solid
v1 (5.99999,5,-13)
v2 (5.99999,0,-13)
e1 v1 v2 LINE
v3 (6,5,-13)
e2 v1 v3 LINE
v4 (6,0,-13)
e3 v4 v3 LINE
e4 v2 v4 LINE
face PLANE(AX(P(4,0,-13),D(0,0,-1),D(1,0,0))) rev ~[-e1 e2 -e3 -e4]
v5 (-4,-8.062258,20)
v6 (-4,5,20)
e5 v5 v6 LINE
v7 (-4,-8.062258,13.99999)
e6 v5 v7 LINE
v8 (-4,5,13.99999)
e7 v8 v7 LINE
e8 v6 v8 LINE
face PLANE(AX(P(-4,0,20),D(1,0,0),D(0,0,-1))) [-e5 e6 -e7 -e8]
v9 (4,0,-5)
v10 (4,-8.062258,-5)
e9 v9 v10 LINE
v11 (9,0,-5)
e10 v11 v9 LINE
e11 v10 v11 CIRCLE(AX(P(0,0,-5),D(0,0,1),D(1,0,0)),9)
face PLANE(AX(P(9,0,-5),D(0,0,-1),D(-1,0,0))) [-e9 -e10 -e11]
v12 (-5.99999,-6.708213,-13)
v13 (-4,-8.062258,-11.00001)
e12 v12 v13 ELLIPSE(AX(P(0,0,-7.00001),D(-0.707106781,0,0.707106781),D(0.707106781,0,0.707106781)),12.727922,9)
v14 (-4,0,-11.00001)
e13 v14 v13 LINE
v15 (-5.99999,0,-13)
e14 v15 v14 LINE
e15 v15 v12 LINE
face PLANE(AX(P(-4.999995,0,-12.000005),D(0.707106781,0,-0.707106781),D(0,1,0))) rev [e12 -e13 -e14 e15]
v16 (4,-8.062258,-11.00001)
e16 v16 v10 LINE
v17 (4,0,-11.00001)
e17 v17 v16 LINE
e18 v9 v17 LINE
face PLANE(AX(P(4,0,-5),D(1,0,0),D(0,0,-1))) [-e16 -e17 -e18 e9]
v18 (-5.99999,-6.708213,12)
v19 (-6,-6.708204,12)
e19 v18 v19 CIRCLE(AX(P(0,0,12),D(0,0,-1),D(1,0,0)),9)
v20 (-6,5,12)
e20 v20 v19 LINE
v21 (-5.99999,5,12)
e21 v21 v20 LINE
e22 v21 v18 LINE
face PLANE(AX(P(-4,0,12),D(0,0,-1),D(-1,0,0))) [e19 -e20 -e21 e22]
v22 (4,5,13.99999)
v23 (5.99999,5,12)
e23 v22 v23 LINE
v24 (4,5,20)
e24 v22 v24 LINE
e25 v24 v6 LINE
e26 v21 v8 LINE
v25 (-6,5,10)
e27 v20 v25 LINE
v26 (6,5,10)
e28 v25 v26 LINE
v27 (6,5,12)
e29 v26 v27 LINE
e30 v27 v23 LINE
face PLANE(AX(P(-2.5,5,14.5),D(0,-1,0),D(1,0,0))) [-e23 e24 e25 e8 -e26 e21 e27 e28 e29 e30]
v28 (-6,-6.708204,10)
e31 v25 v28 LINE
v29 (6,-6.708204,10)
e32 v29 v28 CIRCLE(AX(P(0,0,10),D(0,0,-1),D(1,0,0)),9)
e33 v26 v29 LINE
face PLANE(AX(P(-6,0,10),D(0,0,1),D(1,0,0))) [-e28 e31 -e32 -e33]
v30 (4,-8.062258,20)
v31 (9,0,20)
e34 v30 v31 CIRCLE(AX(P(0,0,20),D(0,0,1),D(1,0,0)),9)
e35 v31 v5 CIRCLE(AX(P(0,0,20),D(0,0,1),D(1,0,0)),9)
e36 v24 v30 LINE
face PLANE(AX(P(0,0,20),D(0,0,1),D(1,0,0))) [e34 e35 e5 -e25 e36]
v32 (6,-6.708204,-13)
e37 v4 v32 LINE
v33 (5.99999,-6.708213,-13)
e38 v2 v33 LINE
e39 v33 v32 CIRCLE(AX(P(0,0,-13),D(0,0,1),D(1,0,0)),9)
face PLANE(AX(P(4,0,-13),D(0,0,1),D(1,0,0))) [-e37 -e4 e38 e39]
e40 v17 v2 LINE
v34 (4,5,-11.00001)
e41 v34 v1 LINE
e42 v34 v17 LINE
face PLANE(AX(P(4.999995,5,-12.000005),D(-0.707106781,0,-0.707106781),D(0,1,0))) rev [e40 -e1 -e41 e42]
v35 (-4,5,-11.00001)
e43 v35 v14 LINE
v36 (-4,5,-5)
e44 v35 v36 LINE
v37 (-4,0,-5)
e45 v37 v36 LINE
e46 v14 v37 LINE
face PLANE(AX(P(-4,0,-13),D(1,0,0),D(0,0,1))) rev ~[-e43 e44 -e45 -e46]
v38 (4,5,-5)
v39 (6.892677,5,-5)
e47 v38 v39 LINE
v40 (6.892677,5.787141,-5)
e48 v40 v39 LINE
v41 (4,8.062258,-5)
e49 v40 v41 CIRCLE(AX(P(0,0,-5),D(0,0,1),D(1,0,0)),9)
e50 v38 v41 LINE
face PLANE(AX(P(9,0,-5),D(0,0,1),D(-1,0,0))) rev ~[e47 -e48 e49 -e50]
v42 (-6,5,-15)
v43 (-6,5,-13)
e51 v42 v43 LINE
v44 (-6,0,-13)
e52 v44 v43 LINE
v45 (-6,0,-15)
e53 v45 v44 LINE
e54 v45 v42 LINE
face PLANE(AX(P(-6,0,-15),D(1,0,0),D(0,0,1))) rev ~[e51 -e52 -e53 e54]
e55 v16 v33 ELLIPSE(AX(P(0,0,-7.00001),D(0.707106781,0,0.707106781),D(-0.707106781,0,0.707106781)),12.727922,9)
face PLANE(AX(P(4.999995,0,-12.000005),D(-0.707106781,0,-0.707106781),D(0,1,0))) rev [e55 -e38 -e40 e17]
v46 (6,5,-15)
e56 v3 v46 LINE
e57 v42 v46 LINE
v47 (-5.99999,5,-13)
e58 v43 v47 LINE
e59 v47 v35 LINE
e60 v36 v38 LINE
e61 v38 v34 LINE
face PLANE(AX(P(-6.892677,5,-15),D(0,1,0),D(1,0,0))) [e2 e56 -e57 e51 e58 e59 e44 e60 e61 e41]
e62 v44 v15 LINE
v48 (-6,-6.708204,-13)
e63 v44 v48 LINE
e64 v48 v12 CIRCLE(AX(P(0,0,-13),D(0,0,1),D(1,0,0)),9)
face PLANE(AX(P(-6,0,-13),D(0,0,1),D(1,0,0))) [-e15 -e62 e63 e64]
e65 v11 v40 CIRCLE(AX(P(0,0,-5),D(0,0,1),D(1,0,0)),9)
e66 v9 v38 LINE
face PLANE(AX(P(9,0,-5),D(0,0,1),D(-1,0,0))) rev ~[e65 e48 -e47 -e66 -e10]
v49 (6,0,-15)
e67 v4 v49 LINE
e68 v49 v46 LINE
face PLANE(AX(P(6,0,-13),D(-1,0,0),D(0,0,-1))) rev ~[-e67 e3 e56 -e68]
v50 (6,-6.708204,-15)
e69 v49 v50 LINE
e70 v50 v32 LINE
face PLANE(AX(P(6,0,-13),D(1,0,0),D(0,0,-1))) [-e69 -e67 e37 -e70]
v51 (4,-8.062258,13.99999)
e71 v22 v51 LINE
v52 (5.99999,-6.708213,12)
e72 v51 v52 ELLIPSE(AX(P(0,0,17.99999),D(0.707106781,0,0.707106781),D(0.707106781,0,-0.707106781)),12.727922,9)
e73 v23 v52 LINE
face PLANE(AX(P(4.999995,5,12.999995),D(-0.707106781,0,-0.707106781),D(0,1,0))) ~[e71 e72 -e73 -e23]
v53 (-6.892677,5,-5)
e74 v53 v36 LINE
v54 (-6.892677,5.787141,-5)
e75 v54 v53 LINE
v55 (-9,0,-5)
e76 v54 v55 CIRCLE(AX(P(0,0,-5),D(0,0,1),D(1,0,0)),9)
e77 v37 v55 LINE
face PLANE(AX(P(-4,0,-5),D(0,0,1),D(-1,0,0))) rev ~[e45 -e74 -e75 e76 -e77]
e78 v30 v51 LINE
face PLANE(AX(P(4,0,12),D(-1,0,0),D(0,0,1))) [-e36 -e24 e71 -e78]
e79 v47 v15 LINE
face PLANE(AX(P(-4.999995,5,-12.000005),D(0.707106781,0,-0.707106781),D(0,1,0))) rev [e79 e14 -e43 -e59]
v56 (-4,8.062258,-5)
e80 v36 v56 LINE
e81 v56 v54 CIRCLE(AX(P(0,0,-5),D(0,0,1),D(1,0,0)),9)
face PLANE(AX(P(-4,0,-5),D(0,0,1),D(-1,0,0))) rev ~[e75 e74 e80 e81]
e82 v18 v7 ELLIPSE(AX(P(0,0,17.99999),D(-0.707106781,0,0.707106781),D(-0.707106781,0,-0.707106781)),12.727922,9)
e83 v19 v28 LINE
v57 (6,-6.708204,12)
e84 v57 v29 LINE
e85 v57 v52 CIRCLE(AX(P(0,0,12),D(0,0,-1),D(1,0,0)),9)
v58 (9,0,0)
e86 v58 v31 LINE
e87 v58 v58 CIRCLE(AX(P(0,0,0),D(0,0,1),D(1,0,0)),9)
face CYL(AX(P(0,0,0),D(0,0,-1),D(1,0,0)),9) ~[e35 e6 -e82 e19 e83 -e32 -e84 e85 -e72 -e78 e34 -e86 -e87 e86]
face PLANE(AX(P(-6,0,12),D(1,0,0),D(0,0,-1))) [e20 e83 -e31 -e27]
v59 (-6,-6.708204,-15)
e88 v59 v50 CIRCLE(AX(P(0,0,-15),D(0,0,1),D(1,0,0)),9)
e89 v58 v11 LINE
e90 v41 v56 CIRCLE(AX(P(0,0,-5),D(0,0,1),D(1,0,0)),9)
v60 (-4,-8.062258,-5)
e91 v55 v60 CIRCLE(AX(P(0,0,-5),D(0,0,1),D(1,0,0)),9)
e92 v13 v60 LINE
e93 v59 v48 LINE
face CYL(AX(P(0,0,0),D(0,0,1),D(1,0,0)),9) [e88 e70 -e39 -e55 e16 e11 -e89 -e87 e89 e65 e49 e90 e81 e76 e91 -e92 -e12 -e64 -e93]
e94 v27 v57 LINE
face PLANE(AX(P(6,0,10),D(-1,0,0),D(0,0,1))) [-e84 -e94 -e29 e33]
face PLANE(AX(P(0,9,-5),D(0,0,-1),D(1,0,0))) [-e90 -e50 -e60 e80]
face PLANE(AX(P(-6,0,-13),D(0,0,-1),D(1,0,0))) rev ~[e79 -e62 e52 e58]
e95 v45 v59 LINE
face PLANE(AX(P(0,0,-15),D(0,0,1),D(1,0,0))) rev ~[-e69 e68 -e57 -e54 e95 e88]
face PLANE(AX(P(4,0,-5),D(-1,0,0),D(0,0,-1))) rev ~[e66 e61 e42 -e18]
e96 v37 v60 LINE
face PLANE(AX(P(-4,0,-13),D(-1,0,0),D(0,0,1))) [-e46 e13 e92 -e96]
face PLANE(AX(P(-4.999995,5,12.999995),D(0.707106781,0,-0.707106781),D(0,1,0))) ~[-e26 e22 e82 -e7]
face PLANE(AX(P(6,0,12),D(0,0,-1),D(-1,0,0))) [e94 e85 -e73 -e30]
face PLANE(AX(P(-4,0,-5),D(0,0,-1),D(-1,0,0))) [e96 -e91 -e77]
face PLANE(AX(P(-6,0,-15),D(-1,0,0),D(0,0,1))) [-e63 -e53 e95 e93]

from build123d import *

# Parameters (mm, degrees)
F0_R          = 9
F1_DEPTH      = 20
F3_DEPTH      = 5
F3_DEPTH_BACK = 25
F4_DEPTH      = 15
F5_DEPTH      = 25
F5_DEPTH_BACK = 25
F6_W          = 13.7853547931
F6_H          = 8
F7_DEPTH      = 10
F8_SIZE2      = 1.99999
F8_SIZE       = 1.99999


# Not quite as in the source:
# - a fillet or chamfer is up to 0.001 mm smaller than in the source, because OpenCascade refuses the exact size


with BuildPart() as f1:
    # F0 (on Top) → F1 (new body)
    with BuildSketch(Plane.XY):
        Circle(F0_R)
    extrude(amount=F1_DEPTH)

    # F2 (on Front) → F3 (cut, two sides)
    with BuildSketch(Plane.XZ) as f3_sk:
        Polygon((0, 10), (0, 20), (-4, 20), (-4, 12), (-6, 12), (-6, 10), align=None)
        Polygon((4, 20), (0, 20), (0, 10), (6, 10), (6, 12), (4, 12), align=None)
        Polygon((-6, -15), (0, -15), (0, -5), (-4, -5), (-4, -13), (-6, -13), align=None)
        Polygon((0, -5), (0, -15), (6, -15), (6, -13), (4, -13), (4, -5), align=None)
        Polygon((6, -13), (6, -15), (9, -15), (9, -5), (4, -5), (4, -13), align=None)
        Polygon((-9, -15), (-6, -15), (-6, -13), (-4, -13), (-4, -5), (-9, -5), align=None)
    extrude(amount=-F3_DEPTH, mode=Mode.SUBTRACT)
    extrude(f3_sk.sketch, amount=F3_DEPTH_BACK, mode=Mode.SUBTRACT)

    # F4 (add): a face of the model
    f4_faces = [f1.faces().sort_by_distance(p)[0] for p in [
        (0, 0, 0),
    ]]
    extrude(f4_faces, amount=F4_DEPTH)

    # F2 (on Front) → F5 (cut, two sides)
    with BuildSketch(Plane.XZ) as f5_sk:
        Polygon((-9, -15), (-6, -15), (-6, -13), (-4, -13), (-4, -5), (-9, -5), align=None)
        Polygon((6, -13), (6, -15), (9, -15), (9, -5), (4, -5), (4, -13), align=None)
    extrude(amount=-F5_DEPTH, mode=Mode.SUBTRACT)
    extrude(f5_sk.sketch, amount=F5_DEPTH_BACK, mode=Mode.SUBTRACT)

    # F6 (on face) → F7 (cut)
    with BuildSketch(Plane(origin=(0, 0, -15), x_dir=(1, 0, 0), z_dir=(0, 0, -1))):
        with Locations((0, -9)):
            Rectangle(F6_W, F6_H)
    extrude(amount=-F7_DEPTH, mode=Mode.SUBTRACT)

    # F8 (size 2 and 2 in the source; OpenCascade refuses exactly that, so slightly less here)
    f8_edges = [f1.edges().sort_by_distance(p)[0] for p in [
        (4, -1.531129, 12),
        (-4, -1.531129, 12),
        (-4, -1.531129, -13),
        (4, -1.531129, -13),
    ]]
    chamfer(f8_edges, length=F8_SIZE, length2=F8_SIZE2)


solid = f1.part
